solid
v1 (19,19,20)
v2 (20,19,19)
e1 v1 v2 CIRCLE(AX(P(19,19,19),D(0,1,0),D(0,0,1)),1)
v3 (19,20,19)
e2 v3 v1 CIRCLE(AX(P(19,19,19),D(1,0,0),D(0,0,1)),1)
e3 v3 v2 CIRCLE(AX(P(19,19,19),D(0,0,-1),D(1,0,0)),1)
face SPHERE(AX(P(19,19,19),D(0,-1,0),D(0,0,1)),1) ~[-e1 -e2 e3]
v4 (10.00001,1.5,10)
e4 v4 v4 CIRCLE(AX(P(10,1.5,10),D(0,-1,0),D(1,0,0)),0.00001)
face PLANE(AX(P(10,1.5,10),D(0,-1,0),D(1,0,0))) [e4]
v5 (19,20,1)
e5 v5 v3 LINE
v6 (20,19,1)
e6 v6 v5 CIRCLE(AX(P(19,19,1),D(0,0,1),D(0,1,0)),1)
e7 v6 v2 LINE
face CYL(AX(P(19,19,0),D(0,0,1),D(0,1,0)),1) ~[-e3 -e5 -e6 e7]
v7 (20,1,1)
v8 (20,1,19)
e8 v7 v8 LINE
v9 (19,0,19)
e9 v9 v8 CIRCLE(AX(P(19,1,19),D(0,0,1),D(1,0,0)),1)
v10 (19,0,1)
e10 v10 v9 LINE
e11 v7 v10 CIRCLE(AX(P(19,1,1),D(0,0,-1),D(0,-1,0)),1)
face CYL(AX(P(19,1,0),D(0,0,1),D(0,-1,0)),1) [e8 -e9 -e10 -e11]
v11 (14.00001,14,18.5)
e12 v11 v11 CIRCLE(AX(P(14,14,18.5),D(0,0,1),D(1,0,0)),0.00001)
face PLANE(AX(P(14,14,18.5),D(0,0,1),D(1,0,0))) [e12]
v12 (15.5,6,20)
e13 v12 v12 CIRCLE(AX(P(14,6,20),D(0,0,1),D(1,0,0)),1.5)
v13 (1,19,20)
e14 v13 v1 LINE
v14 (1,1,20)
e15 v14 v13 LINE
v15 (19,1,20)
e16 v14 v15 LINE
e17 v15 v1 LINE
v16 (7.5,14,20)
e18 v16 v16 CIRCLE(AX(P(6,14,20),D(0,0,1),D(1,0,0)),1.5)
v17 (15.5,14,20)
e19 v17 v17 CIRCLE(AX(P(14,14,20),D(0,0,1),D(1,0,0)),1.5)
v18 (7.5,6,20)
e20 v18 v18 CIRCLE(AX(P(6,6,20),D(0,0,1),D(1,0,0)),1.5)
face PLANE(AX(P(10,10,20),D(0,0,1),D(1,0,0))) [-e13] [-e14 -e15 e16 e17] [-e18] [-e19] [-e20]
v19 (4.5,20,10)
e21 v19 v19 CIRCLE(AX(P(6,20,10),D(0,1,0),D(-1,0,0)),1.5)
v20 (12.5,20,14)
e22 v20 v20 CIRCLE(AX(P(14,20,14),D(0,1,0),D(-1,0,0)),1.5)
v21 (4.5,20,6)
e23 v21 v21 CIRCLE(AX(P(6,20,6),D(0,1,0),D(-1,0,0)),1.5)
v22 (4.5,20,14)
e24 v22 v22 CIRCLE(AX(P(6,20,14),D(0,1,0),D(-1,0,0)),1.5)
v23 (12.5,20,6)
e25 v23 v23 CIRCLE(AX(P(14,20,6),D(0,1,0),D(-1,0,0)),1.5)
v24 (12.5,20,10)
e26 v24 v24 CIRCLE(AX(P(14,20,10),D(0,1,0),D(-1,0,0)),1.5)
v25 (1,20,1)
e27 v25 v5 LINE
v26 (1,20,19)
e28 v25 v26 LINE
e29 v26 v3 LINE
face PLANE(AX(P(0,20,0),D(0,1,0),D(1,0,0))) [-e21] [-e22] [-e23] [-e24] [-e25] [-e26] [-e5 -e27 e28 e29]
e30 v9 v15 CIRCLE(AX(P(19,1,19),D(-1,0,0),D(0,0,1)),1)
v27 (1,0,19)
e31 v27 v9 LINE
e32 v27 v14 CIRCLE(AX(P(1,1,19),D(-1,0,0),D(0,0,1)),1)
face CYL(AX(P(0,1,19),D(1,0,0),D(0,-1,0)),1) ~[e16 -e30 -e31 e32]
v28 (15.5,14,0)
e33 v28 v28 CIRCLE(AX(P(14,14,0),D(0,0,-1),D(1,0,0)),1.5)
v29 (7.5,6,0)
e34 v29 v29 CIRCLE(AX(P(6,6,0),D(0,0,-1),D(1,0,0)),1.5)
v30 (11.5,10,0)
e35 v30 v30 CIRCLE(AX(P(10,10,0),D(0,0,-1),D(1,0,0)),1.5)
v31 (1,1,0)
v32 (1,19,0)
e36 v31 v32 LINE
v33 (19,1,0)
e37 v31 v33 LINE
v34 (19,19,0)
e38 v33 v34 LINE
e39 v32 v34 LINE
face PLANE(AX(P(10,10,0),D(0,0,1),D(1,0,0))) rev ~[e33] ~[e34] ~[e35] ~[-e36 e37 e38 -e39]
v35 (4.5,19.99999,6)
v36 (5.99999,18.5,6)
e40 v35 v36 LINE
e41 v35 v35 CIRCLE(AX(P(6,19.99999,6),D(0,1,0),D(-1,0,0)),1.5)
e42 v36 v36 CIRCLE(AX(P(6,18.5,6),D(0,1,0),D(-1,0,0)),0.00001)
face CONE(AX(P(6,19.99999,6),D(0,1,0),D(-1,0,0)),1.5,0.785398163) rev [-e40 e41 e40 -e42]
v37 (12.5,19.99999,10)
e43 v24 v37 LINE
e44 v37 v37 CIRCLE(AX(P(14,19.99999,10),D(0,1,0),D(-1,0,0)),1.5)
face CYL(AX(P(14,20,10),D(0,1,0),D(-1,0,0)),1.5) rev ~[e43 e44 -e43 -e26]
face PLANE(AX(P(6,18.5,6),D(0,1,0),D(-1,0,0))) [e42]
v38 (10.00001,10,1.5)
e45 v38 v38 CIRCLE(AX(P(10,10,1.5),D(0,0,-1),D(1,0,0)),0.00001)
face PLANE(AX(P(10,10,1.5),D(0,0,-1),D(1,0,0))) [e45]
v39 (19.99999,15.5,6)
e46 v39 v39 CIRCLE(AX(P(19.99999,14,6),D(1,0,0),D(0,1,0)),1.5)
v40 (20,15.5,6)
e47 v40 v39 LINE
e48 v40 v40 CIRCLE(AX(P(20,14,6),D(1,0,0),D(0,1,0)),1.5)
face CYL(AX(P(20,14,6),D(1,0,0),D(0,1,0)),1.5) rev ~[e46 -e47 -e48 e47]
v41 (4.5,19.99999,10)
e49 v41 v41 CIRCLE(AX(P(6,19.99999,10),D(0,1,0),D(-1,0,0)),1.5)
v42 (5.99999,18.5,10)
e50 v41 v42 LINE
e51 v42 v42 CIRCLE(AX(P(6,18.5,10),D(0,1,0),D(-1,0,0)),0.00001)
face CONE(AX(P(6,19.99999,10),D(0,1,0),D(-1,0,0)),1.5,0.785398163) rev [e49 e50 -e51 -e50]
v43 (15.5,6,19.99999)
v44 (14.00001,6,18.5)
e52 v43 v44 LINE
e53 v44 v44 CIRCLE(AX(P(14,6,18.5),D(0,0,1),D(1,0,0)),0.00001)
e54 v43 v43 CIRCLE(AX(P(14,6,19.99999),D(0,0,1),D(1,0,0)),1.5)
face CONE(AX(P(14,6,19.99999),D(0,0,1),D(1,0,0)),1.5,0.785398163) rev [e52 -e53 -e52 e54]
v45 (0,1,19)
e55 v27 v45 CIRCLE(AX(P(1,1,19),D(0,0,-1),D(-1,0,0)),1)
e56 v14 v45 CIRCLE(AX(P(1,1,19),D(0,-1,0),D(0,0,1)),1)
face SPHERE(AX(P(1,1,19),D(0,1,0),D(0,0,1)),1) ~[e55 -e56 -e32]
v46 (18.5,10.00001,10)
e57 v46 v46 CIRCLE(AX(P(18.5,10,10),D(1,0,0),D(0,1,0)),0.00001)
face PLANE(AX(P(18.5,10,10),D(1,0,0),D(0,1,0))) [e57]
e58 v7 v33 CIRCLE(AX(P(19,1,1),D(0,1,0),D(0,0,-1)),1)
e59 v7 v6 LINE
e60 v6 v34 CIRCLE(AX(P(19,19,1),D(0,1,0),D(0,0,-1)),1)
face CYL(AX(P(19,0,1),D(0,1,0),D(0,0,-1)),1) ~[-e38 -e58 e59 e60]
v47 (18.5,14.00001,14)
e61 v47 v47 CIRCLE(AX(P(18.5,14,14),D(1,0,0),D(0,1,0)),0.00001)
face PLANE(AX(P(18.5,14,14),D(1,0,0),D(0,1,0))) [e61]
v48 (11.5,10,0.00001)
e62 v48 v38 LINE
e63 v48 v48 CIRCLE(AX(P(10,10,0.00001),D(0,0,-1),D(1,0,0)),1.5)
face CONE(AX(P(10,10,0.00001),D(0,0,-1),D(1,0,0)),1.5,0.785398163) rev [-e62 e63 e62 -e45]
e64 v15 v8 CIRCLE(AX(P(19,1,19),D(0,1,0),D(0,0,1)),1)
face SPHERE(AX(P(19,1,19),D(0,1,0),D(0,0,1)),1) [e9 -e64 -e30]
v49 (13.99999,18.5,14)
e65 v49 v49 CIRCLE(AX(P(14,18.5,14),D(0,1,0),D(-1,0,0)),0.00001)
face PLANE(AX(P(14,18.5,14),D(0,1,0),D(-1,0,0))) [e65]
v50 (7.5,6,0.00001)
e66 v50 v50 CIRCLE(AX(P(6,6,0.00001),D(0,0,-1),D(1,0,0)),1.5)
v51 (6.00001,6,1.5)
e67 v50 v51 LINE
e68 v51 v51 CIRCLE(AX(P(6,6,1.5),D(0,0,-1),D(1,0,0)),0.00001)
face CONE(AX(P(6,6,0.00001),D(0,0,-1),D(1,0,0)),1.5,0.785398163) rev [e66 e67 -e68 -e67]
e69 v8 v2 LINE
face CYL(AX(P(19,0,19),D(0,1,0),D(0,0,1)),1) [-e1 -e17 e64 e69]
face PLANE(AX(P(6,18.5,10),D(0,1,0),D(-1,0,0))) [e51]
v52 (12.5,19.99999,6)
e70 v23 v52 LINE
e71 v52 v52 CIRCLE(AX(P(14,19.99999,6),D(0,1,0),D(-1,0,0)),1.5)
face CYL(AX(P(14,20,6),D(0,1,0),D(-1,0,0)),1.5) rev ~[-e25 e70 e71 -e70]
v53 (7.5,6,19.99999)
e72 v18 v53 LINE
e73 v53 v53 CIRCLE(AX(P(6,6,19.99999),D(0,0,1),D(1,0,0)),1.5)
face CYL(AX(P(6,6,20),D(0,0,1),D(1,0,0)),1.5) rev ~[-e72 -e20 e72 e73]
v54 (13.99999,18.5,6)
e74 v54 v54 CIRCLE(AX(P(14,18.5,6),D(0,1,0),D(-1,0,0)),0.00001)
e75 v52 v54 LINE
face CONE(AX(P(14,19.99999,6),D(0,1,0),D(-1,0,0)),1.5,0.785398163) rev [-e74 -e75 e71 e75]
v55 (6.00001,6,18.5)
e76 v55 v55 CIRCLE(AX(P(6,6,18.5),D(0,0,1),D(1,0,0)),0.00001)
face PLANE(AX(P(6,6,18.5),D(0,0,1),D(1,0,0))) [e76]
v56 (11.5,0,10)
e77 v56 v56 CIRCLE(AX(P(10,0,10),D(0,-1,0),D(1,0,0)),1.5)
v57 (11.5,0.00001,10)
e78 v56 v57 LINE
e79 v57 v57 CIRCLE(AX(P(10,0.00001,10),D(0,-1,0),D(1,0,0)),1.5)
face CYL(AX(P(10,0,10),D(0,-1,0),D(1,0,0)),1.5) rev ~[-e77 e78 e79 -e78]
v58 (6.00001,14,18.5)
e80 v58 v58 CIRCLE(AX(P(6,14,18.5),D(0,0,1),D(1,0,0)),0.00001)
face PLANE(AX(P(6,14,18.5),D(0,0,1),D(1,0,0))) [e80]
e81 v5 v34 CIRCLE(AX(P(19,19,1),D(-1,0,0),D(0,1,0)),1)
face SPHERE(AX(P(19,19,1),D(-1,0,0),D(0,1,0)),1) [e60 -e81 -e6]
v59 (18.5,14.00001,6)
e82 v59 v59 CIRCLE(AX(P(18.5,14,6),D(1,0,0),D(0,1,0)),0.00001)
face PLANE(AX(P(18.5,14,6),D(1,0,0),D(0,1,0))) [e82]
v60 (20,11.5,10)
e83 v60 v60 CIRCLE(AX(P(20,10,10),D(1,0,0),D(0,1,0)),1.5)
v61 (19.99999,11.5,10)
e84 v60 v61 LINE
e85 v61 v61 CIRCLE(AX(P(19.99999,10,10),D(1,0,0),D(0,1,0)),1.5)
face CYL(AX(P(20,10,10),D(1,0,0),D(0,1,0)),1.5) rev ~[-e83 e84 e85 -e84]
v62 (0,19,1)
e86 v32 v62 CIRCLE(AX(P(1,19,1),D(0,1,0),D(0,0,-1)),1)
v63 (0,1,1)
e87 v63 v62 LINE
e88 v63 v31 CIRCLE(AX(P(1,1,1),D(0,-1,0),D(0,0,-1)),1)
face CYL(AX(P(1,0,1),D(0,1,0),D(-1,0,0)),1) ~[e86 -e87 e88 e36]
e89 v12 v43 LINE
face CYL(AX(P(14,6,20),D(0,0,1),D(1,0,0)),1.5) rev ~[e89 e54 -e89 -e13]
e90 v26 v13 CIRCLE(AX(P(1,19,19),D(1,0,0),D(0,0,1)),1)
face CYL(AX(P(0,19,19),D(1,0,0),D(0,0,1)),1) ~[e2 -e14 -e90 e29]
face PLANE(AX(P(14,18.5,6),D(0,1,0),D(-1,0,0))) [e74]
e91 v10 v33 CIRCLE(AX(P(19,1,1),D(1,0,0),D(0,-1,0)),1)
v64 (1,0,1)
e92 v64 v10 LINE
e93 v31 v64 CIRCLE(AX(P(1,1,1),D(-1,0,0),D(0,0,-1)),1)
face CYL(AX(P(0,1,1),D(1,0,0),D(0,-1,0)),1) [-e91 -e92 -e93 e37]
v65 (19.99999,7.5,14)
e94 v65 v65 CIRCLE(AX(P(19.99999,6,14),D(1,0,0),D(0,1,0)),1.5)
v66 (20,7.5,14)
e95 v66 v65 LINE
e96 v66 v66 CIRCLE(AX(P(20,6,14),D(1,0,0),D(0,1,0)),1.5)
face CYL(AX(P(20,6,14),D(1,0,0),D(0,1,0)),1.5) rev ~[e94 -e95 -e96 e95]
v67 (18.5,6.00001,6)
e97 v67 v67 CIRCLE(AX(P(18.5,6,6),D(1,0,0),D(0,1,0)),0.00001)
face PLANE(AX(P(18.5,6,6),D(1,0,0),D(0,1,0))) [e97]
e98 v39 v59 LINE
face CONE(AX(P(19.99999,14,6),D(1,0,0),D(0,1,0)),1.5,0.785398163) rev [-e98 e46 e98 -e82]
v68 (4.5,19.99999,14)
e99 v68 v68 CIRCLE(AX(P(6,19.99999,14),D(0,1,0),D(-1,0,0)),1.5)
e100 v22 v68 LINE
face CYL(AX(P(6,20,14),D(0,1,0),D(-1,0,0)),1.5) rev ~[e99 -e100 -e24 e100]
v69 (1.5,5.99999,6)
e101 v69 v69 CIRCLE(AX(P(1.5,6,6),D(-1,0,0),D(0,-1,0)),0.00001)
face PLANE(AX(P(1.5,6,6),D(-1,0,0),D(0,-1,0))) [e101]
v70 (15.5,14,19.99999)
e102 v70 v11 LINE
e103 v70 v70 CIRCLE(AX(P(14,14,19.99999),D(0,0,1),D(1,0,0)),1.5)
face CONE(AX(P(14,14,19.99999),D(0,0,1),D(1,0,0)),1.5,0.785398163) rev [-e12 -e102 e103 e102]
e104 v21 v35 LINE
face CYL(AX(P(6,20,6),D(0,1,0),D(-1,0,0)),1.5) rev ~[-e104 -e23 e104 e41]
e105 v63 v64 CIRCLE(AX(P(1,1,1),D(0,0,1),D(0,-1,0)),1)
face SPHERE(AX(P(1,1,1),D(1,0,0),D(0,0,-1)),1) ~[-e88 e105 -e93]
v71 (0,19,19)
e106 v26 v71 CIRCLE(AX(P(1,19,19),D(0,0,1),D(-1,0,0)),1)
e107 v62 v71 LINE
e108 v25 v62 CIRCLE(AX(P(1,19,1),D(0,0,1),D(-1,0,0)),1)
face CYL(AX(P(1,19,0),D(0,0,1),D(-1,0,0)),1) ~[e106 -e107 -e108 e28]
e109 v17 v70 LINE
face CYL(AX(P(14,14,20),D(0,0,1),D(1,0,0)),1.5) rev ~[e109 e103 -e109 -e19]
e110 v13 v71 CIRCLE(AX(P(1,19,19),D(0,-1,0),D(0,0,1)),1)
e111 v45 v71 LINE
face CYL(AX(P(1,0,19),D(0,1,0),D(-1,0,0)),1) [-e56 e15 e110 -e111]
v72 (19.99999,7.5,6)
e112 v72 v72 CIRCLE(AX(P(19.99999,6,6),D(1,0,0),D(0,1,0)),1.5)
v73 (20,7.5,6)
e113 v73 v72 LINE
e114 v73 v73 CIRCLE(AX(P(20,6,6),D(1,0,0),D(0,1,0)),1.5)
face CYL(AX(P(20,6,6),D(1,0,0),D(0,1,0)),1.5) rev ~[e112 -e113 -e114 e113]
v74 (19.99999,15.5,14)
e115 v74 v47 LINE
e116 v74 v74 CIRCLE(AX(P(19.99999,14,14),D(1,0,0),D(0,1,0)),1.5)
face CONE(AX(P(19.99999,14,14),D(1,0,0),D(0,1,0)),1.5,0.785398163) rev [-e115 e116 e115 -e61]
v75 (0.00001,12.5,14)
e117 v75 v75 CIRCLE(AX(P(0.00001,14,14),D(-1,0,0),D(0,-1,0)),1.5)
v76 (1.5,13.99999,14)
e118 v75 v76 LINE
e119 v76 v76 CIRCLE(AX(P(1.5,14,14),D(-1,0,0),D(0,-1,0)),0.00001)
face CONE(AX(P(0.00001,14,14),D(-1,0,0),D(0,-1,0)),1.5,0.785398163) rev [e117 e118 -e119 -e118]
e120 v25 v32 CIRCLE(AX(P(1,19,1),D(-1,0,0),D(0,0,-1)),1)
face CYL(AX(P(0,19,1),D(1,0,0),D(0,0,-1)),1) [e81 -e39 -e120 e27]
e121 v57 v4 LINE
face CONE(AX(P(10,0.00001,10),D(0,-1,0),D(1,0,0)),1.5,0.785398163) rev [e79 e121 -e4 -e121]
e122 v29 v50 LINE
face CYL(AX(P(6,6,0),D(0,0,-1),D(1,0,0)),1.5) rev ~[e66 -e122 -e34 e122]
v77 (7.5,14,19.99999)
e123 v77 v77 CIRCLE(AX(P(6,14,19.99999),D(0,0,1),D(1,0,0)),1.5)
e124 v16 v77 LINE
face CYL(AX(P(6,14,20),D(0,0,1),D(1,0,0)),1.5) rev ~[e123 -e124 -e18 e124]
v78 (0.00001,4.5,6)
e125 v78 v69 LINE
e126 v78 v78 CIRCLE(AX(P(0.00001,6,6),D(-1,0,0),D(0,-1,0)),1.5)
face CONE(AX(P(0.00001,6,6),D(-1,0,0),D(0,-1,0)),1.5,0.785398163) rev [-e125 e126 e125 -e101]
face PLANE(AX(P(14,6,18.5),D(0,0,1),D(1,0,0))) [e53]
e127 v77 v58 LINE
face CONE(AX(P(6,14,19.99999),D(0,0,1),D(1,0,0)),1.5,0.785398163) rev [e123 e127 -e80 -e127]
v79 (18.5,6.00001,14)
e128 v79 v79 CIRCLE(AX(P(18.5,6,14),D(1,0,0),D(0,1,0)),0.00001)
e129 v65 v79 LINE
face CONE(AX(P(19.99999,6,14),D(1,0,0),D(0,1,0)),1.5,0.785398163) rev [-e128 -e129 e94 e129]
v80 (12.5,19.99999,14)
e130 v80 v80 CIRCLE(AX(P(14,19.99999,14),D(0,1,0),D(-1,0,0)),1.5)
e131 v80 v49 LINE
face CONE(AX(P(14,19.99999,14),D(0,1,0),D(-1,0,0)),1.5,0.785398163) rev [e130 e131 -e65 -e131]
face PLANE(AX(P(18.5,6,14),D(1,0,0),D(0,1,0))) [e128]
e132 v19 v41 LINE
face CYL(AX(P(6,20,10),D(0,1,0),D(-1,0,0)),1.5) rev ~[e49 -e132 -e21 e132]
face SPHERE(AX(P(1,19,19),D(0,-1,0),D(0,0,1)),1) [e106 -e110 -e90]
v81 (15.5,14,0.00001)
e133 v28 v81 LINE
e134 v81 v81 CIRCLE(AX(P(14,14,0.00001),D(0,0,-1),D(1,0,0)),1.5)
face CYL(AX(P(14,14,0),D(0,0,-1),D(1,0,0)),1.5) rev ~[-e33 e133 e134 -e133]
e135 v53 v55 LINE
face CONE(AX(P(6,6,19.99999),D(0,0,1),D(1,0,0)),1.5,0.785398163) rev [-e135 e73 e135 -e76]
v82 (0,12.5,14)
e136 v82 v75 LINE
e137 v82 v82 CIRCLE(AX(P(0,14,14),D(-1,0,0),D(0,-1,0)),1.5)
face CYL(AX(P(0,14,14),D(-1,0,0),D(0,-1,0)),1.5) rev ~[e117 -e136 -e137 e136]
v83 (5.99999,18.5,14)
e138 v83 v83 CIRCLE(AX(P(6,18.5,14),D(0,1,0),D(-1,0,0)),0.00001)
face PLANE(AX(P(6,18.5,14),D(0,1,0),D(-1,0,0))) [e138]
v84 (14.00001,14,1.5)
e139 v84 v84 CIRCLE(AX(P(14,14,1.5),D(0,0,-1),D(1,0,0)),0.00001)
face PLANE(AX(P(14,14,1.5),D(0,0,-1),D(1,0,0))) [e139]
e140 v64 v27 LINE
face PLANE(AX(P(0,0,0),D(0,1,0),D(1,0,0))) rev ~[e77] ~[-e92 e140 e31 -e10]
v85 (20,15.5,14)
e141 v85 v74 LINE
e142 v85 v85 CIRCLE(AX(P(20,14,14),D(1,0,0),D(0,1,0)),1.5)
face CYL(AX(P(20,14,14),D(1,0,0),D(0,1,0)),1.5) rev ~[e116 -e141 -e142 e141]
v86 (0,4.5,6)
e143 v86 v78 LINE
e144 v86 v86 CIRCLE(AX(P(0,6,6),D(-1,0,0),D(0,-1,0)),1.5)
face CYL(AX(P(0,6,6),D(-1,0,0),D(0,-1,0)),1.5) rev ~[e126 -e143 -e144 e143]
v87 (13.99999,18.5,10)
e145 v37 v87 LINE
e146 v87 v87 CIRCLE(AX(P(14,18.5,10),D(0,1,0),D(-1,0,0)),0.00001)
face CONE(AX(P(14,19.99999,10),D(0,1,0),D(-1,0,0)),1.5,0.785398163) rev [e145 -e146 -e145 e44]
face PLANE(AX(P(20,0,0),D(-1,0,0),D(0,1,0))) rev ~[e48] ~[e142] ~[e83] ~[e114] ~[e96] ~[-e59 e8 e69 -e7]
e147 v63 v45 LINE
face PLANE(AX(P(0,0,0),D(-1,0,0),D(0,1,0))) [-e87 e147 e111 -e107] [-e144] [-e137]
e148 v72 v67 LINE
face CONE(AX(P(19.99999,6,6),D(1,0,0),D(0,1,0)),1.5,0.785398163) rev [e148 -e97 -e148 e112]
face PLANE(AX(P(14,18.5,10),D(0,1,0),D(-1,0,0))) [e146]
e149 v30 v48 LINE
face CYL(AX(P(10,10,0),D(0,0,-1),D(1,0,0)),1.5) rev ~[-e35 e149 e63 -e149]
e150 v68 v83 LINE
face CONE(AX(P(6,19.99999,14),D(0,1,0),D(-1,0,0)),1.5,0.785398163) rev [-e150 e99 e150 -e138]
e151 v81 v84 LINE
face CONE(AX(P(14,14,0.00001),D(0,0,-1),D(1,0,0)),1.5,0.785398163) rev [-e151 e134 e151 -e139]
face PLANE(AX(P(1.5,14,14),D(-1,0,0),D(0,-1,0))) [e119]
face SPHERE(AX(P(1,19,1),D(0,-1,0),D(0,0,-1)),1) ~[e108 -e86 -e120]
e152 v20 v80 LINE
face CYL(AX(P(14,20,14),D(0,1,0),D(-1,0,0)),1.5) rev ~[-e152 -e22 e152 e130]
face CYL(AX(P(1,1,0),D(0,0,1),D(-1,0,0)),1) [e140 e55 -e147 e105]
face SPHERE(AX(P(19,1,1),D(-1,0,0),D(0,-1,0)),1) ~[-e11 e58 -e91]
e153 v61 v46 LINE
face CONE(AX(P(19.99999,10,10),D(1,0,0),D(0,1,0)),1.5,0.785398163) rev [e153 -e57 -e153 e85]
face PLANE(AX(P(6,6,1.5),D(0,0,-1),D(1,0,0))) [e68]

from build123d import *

# Parameters (mm, degrees)
F0_W      = 20
F0_H      = 20
F1_DEPTH  = 20
F2_R      = 1.5
F3_DEPTH  = 1.5
F4_R      = 1.5
F5_DEPTH  = 1.5
F6_R      = 1.5
F7_DEPTH  = 1.5
F8_R      = 1.5
F9_DEPTH  = 1.5
F10_R     = 1.5
F11_DEPTH = 1.5
F12_R     = 1.5
F13_DEPTH = 1.5
F14_R     = 1
F15_SIZE  = 1.49999


# Not quite as in the source:
# - a fillet or chamfer is up to 0.001 mm smaller than in the source, because OpenCascade refuses the exact size


with BuildPart() as f1:
    # F0 (on Top) → F1 (new body)
    with BuildSketch(Plane.XY):
        with Locations((10, 10)):
            Rectangle(F0_W, F0_H)
    extrude(amount=F1_DEPTH)

    # F2 (on face) → F3 (cut)
    with BuildSketch(Plane.XZ):
        with Locations((10, 10)):
            Circle(F2_R)
    extrude(amount=-F3_DEPTH, mode=Mode.SUBTRACT)

    # F4 (on face) → F5 (cut)
    with BuildSketch(Plane.XY.offset(20)):
        with Locations((6, 14)):
            Circle(F4_R)
        with Locations((6, 6)):
            Circle(F4_R)
        with Locations((14, 6)):
            Circle(F4_R)
        with Locations((14, 14)):
            Circle(F4_R)
    extrude(amount=-F5_DEPTH, mode=Mode.SUBTRACT)

    # F6 (on face) → F7 (cut)
    with BuildSketch(Plane.YZ.offset(20)):
        with Locations((6, 14)):
            Circle(F6_R)
        with Locations((6, 6)):
            Circle(F6_R)
        with Locations((14, 6)):
            Circle(F6_R)
        with Locations((14, 14)):
            Circle(F6_R)
        with Locations((10, 10)):
            Circle(F6_R)
    extrude(amount=-F7_DEPTH, mode=Mode.SUBTRACT)

    # F8 (on face) → F9 (cut)
    with BuildSketch(Plane(origin=(0, 20, 0), x_dir=(-1, 0, 0), z_dir=(0, 1, 0))):
        with Locations((-14, 14)):
            Circle(F8_R)
        with Locations((-14, 6)):
            Circle(F8_R)
        with Locations((-14, 10)):
            Circle(F8_R)
        with Locations((-6, 14)):
            Circle(F8_R)
        with Locations((-6, 10)):
            Circle(F8_R)
        with Locations((-6, 6)):
            Circle(F8_R)
    extrude(amount=-F9_DEPTH, mode=Mode.SUBTRACT)

    # F10 (on face) → F11 (cut)
    with BuildSketch(Plane(origin=(0, 0, 0), x_dir=(0, -1, 0), z_dir=(-1, 0, 0))):
        with Locations((-14, 14)):
            Circle(F10_R)
        with Locations((-6, 6)):
            Circle(F10_R)
    extrude(amount=-F11_DEPTH, mode=Mode.SUBTRACT)

    # F12 (on face) → F13 (cut)
    with BuildSketch(Plane(origin=(0, 0, 0), x_dir=(1, 0, 0), z_dir=(0, 0, -1))):
        with Locations((6, -6)):
            Circle(F12_R)
        with Locations((14, -14)):
            Circle(F12_R)
        with Locations((10, -10)):
            Circle(F12_R)
    extrude(amount=-F13_DEPTH, mode=Mode.SUBTRACT)

    # F14
    f14_edges = [f1.edges().sort_by_distance(p)[0] for p in [
        (0, 10, 20),
        (20, 10, 20),
        (10, 0, 20),
        (10, 0, 0),
        (0, 10, 0),
        (10, 20, 0),
        (10, 20, 20),
        (20, 20, 10),
        (0, 20, 10),
        (20, 0, 10),
        (0, 0, 10),
        (20, 10, 0),
    ]]
    fillet(f14_edges, radius=F14_R)

    # F15 (size 1.5 in the source; OpenCascade refuses exactly that, so slightly less here)
    f15_edges = [f1.edges().sort_by_distance(p)[0] for p in [
        (8.5, 1.5, 10),
        (4.5, 14, 18.5),
        (4.5, 6, 18.5),
        (12.5, 6, 18.5),
        (12.5, 14, 18.5),
        (18.5, 4.5, 6),
        (18.5, 4.5, 14),
        (18.5, 12.5, 14),
        (18.5, 12.5, 6),
        (18.5, 8.5, 10),
        (15.5, 18.5, 14),
        (15.5, 18.5, 10),
        (15.5, 18.5, 6),
        (7.5, 18.5, 6),
        (7.5, 18.5, 10),
        (7.5, 18.5, 14),
        (1.5, 15.5, 14),
        (1.5, 7.5, 6),
        (4.5, 6, 1.5),
        (8.5, 10, 1.5),
        (12.5, 14, 1.5),
    ]]
    chamfer(f15_edges, length=F15_SIZE)


solid = f1.part
